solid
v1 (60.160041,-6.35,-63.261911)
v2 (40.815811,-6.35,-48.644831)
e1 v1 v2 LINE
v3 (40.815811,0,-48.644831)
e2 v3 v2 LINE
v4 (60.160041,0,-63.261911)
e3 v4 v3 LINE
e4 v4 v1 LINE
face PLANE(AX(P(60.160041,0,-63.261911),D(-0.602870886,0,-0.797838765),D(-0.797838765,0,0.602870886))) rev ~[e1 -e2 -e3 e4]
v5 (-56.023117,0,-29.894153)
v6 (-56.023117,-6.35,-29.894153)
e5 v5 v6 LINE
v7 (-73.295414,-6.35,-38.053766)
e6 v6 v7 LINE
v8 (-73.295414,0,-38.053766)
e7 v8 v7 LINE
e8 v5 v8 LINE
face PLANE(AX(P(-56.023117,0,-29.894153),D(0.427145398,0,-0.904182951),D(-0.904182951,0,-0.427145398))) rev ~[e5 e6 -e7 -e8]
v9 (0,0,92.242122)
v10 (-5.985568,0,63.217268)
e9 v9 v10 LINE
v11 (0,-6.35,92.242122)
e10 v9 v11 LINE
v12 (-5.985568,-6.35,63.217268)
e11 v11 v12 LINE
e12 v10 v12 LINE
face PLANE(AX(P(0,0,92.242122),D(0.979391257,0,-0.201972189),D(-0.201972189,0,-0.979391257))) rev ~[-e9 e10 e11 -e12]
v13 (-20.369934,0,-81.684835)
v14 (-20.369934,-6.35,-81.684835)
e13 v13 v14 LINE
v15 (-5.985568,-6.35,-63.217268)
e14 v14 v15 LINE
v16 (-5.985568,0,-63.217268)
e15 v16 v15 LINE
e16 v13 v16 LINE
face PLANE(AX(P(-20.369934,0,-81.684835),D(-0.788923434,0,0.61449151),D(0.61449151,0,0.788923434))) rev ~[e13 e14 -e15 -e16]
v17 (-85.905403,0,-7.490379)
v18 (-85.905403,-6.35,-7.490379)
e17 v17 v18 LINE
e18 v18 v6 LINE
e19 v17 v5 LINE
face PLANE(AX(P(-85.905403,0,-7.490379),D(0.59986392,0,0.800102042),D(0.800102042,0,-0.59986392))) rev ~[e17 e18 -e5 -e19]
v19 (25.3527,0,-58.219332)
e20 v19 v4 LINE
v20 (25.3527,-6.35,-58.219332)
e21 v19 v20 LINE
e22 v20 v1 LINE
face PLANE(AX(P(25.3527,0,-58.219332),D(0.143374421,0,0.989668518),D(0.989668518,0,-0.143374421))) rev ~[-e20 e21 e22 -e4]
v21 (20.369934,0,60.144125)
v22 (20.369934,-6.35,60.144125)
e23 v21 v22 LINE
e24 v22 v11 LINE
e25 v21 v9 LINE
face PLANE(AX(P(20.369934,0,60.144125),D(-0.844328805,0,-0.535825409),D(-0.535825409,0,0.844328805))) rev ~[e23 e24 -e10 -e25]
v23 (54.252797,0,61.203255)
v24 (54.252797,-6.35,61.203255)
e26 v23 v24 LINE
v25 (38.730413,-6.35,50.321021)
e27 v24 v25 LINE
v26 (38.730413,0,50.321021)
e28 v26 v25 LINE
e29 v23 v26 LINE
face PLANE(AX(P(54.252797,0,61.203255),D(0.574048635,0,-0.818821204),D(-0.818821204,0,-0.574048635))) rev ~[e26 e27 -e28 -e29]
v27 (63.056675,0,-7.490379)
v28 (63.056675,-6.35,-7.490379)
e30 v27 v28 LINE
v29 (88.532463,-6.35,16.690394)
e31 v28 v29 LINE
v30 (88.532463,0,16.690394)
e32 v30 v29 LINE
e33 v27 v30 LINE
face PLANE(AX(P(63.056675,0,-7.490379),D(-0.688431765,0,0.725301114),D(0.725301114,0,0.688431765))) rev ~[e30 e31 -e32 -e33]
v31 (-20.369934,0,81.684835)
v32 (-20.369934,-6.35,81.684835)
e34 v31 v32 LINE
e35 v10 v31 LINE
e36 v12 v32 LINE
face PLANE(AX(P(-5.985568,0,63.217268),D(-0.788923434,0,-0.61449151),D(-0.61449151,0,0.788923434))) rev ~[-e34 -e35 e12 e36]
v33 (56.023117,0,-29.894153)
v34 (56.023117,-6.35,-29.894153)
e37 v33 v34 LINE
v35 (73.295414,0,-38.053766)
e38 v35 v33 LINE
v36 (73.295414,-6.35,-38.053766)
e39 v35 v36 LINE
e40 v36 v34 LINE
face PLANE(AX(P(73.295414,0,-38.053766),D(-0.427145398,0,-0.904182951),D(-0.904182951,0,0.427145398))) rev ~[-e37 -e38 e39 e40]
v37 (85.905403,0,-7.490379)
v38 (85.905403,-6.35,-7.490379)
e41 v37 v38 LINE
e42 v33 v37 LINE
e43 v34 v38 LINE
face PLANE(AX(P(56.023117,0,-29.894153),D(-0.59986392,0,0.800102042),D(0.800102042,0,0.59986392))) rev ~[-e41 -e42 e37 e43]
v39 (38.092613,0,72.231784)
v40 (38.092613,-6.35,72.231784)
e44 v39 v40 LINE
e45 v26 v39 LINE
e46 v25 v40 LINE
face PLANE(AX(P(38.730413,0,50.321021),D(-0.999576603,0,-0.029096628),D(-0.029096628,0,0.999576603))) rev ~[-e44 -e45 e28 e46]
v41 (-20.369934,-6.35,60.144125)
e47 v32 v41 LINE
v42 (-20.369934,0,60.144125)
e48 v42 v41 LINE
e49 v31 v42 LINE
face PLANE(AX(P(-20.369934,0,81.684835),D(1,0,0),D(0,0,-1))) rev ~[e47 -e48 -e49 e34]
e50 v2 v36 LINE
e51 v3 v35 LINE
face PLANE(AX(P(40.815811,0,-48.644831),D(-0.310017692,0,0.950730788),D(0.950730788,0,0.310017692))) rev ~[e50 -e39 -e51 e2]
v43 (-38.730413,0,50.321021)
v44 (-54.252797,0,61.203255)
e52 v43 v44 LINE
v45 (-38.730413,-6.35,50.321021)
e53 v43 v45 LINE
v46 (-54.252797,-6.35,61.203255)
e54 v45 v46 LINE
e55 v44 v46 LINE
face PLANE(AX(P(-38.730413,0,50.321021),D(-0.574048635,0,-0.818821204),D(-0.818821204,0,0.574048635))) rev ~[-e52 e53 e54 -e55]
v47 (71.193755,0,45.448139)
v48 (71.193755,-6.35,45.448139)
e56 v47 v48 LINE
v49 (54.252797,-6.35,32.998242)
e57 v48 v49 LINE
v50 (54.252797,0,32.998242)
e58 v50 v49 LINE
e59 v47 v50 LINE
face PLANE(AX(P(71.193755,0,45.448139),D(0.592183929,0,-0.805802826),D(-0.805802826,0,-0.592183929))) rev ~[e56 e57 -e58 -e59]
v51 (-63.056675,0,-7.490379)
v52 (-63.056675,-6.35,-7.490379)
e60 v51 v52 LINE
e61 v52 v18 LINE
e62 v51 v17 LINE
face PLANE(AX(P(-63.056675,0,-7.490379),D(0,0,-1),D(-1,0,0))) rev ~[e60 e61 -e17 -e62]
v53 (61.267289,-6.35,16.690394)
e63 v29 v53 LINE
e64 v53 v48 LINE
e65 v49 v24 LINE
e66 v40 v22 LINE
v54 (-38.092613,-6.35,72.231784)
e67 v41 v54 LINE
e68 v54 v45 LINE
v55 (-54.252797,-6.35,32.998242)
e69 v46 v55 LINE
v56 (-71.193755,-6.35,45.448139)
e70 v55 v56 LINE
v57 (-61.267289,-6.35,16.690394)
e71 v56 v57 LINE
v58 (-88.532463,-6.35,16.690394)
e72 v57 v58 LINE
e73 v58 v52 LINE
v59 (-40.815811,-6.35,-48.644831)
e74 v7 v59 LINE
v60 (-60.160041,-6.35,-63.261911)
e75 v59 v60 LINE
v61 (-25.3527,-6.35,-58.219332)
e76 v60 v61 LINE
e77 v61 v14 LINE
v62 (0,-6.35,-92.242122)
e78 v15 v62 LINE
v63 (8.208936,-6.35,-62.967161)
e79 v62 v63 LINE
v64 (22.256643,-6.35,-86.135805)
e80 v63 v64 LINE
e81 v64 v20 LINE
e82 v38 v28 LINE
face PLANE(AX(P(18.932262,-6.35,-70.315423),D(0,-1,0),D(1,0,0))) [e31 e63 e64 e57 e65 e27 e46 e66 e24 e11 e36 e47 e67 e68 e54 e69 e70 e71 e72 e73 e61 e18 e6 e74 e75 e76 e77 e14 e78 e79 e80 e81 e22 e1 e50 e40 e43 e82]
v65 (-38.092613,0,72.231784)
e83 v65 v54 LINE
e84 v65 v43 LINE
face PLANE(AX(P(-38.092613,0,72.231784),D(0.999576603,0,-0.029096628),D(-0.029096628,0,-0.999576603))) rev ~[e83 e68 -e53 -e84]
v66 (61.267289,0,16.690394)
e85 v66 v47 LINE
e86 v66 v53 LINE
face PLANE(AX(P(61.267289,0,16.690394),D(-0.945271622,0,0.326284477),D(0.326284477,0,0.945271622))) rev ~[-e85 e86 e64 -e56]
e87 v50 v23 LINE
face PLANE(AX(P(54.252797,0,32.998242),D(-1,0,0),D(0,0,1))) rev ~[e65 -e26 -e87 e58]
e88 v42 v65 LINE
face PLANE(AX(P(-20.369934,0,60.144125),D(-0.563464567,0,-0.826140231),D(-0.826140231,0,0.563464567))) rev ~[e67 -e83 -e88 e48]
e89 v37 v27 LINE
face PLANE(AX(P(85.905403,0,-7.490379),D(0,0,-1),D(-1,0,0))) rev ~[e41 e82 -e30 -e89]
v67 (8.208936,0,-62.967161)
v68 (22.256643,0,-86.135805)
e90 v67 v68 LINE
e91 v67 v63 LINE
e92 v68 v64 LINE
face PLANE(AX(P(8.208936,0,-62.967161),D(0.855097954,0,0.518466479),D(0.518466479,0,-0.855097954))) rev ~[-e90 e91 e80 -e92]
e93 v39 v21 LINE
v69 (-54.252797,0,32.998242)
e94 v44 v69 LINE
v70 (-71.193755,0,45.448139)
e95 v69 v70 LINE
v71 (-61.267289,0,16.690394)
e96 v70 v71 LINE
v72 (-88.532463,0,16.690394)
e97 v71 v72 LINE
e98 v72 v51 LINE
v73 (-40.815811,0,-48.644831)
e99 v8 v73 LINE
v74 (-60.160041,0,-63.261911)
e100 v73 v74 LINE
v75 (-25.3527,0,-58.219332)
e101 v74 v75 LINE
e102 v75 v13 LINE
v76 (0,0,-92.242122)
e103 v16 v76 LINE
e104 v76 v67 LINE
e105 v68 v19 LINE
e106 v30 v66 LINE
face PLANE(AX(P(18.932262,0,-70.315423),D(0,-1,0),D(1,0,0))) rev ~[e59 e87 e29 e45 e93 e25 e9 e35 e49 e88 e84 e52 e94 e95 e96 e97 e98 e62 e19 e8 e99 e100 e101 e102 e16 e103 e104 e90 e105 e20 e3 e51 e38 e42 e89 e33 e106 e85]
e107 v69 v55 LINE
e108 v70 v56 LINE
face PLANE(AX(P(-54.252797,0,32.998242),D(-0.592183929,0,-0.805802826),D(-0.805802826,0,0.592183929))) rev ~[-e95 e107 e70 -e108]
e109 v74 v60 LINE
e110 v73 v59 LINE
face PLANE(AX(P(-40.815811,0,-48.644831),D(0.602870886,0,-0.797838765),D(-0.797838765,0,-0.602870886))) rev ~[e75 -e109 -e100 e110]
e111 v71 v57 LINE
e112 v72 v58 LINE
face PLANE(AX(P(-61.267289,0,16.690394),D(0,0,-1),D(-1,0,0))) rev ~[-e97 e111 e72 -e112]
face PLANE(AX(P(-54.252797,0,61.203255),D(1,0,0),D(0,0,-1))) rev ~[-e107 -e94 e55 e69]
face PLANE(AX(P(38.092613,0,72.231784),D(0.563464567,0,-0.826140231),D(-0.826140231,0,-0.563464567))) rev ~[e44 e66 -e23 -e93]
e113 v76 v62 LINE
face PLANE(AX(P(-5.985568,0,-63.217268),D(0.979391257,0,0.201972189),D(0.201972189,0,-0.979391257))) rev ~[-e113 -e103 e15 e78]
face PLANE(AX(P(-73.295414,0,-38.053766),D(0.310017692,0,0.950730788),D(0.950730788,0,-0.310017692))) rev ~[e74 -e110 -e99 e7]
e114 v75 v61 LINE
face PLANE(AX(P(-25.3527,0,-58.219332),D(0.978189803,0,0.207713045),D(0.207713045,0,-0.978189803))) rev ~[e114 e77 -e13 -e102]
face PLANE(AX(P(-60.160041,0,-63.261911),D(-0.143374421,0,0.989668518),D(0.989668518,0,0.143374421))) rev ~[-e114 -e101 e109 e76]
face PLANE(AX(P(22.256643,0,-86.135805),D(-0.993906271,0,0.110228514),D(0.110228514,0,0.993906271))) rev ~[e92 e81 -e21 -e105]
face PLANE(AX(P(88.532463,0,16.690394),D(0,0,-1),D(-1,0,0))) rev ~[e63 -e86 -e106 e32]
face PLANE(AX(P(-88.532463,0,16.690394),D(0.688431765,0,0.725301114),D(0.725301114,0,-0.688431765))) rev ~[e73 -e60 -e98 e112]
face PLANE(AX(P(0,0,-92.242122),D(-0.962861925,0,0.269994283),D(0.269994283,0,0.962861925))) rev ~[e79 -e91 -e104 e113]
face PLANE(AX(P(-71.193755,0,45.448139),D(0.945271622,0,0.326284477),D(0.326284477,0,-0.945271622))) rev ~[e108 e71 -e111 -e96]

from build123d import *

# Parameters (mm, degrees)
F1_DEPTH = 6.35
F2_DEPTH = 6.35
F3_DEPTH = 6.35
F4_DEPTH = 6.35
F5_DEPTH = 6.35


# Not quite as in the source:
# - a feature names something its author has since deleted; it is built from what else it names


with BuildPart() as f1:
    # F0 (on Front) → F1 (new body)
    with BuildSketch(Plane.XZ):
        with BuildLine():
            ThreePointArc((63.0566746496, -7.490379305), (63.3890717721, -3.751743578), (63.5, 0))
            ThreePointArc((63.5, 0), (62.9393473013, 8.4195345051), (61.2672894084, 16.6903939003))
            ThreePointArc((61.2672894084, 16.6903939003), (58.3327446269, 25.0906537239), (54.2527974979, 32.9982418266))
            ThreePointArc((54.2527974979, 32.9982418266), (47.291532101, 42.3764202304), (38.730412603, 50.3210208521))
            ThreePointArc((38.730412603, 50.3210208521), (29.9555685969, 55.9903019284), (20.3699341201, 60.1441250991))
            ThreePointArc((20.3699341201, 60.1441250991), (7.3544916147, 63.0726680353), (-5.9855682874, 63.2172679912))
            ThreePointArc((-5.9855682874, 63.2172679912), (-13.2670335267, 62.09859758), (-20.3699341201, 60.1441250991))
            ThreePointArc((-20.3699341201, 60.1441250991), (-29.9555685969, 55.9903019284), (-38.730412603, 50.3210208521))
            ThreePointArc((-38.730412603, 50.3210208521), (-47.291532101, 42.3764202304), (-54.2527974979, 32.9982418266))
            ThreePointArc((-54.2527974979, 32.9982418266), (-58.3327446269, 25.0906537239), (-61.2672894084, 16.6903939003))
            ThreePointArc((-61.2672894084, 16.6903939003), (-63.3268462658, 4.6862076377), (-63.0566746496, -7.490379305))
            ThreePointArc((-63.0566746496, -7.490379305), (-60.5844983842, -19.0202143924), (-56.023116606, -29.8941533708))
            ThreePointArc((-56.023116606, -29.8941533708), (-49.318773707, -39.9988569841), (-40.8158107072, -48.6448311366))
            ThreePointArc((-40.8158107072, -48.6448311366), (-33.4288158961, -53.9885568226), (-25.3527004473, -58.2193316694))
            ThreePointArc((-25.3527004473, -58.2193316694), (-15.8671551858, -61.4856356095), (-5.9855682874, -63.2172679912))
            ThreePointArc((-5.9855682874, -63.2172679912), (1.1186954333, -63.4901450662), (8.2089360928, -62.9671610304))
            ThreePointArc((8.2089360928, -62.9671610304), (16.9479005402, -61.1965576424), (25.3527004473, -58.2193316694))
            ThreePointArc((25.3527004473, -58.2193316694), (33.4288158961, -53.9885568226), (40.8158107072, -48.6448311366))
            ThreePointArc((40.8158107072, -48.6448311366), (49.318773707, -39.9988569841), (56.023116606, -29.8941533708))
            ThreePointArc((56.023116606, -29.8941533708), (60.5844983842, -19.0202143924), (63.0566746496, -7.490379305))
        make_face()
        with BuildLine():
            ThreePointArc((61.2672894084, 16.6903939003), (62.9393473013, 8.4195345051), (63.5, 0))
            ThreePointArc((63.5, 0), (63.3890717721, -3.751743578), (63.0566746496, -7.490379305))
            Line((63.0566746496, -7.490379305), (88.5324627161, 16.6903939003))
            Line((88.5324627161, 16.6903939003), (61.2672894084, 16.6903939003))
        make_face()
        with BuildLine():
            ThreePointArc((54.2527974979, 32.9982418266), (58.3327446269, 25.0906537239), (61.2672894084, 16.6903939003))
            Line((61.2672894084, 16.6903939003), (71.193754673, 45.4481393099))
            Line((71.193754673, 45.4481393099), (54.2527974979, 32.9982418266))
        make_face()
        with BuildLine():
            Line((85.9054028988, -7.490379305), (63.0566746496, -7.490379305))
            ThreePointArc((63.0566746496, -7.490379305), (60.5844983842, -19.0202143924), (56.023116606, -29.8941533708))
            Line((56.023116606, -29.8941533708), (85.9054028988, -7.490379305))
        make_face()
        with BuildLine():
            ThreePointArc((38.730412603, 50.3210208521), (47.291532101, 42.3764202304), (54.2527974979, 32.9982418266))
            Line((54.2527974979, 32.9982418266), (54.2527974979, 61.2032547377))
            Line((54.2527974979, 61.2032547377), (38.730412603, 50.3210208521))
        make_face()
        with BuildLine():
            ThreePointArc((20.3699341201, 60.1441250991), (29.9555685969, 55.9903019284), (38.730412603, 50.3210208521))
            Line((38.730412603, 50.3210208521), (38.0926132202, 72.2317844629))
            Line((38.0926132202, 72.2317844629), (20.3699341201, 60.1441250991))
        make_face()
        with BuildLine():
            Line((60.1600408554, -63.261911273), (40.8158107072, -48.6448311366))
            ThreePointArc((40.8158107072, -48.6448311366), (33.4288158961, -53.9885568226), (25.3527004473, -58.2193316694))
            Line((25.3527004473, -58.2193316694), (60.1600408554, -63.261911273))
        make_face()
        with BuildLine():
            ThreePointArc((-20.3699341201, 60.1441250991), (-13.2670335267, 62.09859758), (-5.9855682874, 63.2172679912))
            Line((-5.9855682874, 63.2172679912), (-20.3699341201, 81.6848352551))
            Line((-20.3699341201, 81.6848352551), (-20.3699341201, 60.1441250991))
        make_face()
        with BuildLine():
            ThreePointArc((-38.730412603, 50.3210208521), (-29.9555685969, 55.9903019284), (-20.3699341201, 60.1441250991))
            Line((-20.3699341201, 60.1441250991), (-38.0926132202, 72.2317844629))
            Line((-38.0926132202, 72.2317844629), (-38.730412603, 50.3210208521))
        make_face()
        with BuildLine():
            ThreePointArc((-54.2527974979, 32.9982418266), (-47.291532101, 42.3764202304), (-38.730412603, 50.3210208521))
            Line((-38.730412603, 50.3210208521), (-54.2527974979, 61.2032547377))
            Line((-54.2527974979, 61.2032547377), (-54.2527974979, 32.9982418266))
        make_face()
        with BuildLine():
            Line((-60.1600408554, -63.261911273), (-25.3527004473, -58.2193316694))
            ThreePointArc((-25.3527004473, -58.2193316694), (-33.4288158961, -53.9885568226), (-40.8158107072, -48.6448311366))
            Line((-40.8158107072, -48.6448311366), (-60.1600408554, -63.261911273))
        make_face()
        with BuildLine():
            ThreePointArc((-61.2672894084, 16.6903939003), (-58.3327446269, 25.0906537239), (-54.2527974979, 32.9982418266))
            Line((-54.2527974979, 32.9982418266), (-71.193754673, 45.4481393099))
            Line((-71.193754673, 45.4481393099), (-61.2672894084, 16.6903939003))
        make_face()
        with BuildLine():
            ThreePointArc((-63.0566746496, -7.490379305), (-63.3268462658, 4.6862076377), (-61.2672894084, 16.6903939003))
            Line((-61.2672894084, 16.6903939003), (-88.5324627161, 16.6903939003))
            Line((-88.5324627161, 16.6903939003), (-63.0566746496, -7.490379305))
        make_face()
        with BuildLine():
            Line((-85.9054028988, -7.490379305), (-56.023116606, -29.8941533708))
            ThreePointArc((-56.023116606, -29.8941533708), (-60.5844983842, -19.0202143924), (-63.0566746496, -7.490379305))
            Line((-63.0566746496, -7.490379305), (-85.9054028988, -7.490379305))
        make_face()
    extrude(amount=F1_DEPTH)

    # F0 (on Front) → F2 (join)
    with BuildSketch(Plane.XZ):
        with BuildLine():
            Line((-73.2954144478, -38.053765893), (-40.8158107072, -48.6448311366))
            ThreePointArc((-40.8158107072, -48.6448311366), (-49.318773707, -39.9988569841), (-56.023116606, -29.8941533708))
            Line((-56.023116606, -29.8941533708), (-73.2954144478, -38.053765893))
        make_face()
        with BuildLine():
            Line((73.2954144478, -38.053765893), (56.023116606, -29.8941533708))
            ThreePointArc((56.023116606, -29.8941533708), (49.318773707, -39.9988569841), (40.8158107072, -48.6448311366))
            Line((40.8158107072, -48.6448311366), (73.2954144478, -38.053765893))
        make_face()
    extrude(amount=F2_DEPTH)

    # F0 (on Front) → F3 (join)
    with BuildSketch(Plane.XZ):
        with BuildLine():
            Line((0, -92.2421216965), (8.2089360928, -62.9671610304))
            ThreePointArc((8.2089360928, -62.9671610304), (1.1186954333, -63.4901450662), (-5.9855682874, -63.2172679912))
            Line((-5.9855682874, -63.2172679912), (0, -92.2421216965))
        make_face()
        with BuildLine():
            ThreePointArc((-5.9855682874, 63.2172679912), (7.3544916147, 63.0726680353), (20.3699341201, 60.1441250991))
            Line((20.3699341201, 60.1441250991), (0, 92.2421216965))
            Line((0, 92.2421216965), (-5.9855682874, 63.2172679912))
        make_face()
    extrude(amount=F3_DEPTH)

    # F0 (on Front) → F4 (join)
    with BuildSketch(Plane.XZ):
        with BuildLine():
            Line((-20.3699341201, -81.6848352551), (-5.9855682874, -63.2172679912))
            ThreePointArc((-5.9855682874, -63.2172679912), (-15.8671551858, -61.4856356095), (-25.3527004473, -58.2193316694))
            Line((-25.3527004473, -58.2193316694), (-20.3699341201, -81.6848352551))
        make_face()
        with BuildLine():
            Line((60.1600408554, -63.261911273), (40.8158107072, -48.6448311366))
            ThreePointArc((40.8158107072, -48.6448311366), (33.4288158961, -53.9885568226), (25.3527004473, -58.2193316694))
            Line((25.3527004473, -58.2193316694), (60.1600408554, -63.261911273))
        make_face()
    extrude(amount=F4_DEPTH)

    # F0 (on Front) → F5 (join)
    with BuildSketch(Plane.XZ):
        with BuildLine():
            Line((22.25664258, -86.1358046532), (25.3527004473, -58.2193316694))
            ThreePointArc((25.3527004473, -58.2193316694), (16.9479005402, -61.1965576424), (8.2089360928, -62.9671610304))
            Line((8.2089360928, -62.9671610304), (22.25664258, -86.1358046532))
        make_face()
    extrude(amount=F5_DEPTH)


solid = f1.part
